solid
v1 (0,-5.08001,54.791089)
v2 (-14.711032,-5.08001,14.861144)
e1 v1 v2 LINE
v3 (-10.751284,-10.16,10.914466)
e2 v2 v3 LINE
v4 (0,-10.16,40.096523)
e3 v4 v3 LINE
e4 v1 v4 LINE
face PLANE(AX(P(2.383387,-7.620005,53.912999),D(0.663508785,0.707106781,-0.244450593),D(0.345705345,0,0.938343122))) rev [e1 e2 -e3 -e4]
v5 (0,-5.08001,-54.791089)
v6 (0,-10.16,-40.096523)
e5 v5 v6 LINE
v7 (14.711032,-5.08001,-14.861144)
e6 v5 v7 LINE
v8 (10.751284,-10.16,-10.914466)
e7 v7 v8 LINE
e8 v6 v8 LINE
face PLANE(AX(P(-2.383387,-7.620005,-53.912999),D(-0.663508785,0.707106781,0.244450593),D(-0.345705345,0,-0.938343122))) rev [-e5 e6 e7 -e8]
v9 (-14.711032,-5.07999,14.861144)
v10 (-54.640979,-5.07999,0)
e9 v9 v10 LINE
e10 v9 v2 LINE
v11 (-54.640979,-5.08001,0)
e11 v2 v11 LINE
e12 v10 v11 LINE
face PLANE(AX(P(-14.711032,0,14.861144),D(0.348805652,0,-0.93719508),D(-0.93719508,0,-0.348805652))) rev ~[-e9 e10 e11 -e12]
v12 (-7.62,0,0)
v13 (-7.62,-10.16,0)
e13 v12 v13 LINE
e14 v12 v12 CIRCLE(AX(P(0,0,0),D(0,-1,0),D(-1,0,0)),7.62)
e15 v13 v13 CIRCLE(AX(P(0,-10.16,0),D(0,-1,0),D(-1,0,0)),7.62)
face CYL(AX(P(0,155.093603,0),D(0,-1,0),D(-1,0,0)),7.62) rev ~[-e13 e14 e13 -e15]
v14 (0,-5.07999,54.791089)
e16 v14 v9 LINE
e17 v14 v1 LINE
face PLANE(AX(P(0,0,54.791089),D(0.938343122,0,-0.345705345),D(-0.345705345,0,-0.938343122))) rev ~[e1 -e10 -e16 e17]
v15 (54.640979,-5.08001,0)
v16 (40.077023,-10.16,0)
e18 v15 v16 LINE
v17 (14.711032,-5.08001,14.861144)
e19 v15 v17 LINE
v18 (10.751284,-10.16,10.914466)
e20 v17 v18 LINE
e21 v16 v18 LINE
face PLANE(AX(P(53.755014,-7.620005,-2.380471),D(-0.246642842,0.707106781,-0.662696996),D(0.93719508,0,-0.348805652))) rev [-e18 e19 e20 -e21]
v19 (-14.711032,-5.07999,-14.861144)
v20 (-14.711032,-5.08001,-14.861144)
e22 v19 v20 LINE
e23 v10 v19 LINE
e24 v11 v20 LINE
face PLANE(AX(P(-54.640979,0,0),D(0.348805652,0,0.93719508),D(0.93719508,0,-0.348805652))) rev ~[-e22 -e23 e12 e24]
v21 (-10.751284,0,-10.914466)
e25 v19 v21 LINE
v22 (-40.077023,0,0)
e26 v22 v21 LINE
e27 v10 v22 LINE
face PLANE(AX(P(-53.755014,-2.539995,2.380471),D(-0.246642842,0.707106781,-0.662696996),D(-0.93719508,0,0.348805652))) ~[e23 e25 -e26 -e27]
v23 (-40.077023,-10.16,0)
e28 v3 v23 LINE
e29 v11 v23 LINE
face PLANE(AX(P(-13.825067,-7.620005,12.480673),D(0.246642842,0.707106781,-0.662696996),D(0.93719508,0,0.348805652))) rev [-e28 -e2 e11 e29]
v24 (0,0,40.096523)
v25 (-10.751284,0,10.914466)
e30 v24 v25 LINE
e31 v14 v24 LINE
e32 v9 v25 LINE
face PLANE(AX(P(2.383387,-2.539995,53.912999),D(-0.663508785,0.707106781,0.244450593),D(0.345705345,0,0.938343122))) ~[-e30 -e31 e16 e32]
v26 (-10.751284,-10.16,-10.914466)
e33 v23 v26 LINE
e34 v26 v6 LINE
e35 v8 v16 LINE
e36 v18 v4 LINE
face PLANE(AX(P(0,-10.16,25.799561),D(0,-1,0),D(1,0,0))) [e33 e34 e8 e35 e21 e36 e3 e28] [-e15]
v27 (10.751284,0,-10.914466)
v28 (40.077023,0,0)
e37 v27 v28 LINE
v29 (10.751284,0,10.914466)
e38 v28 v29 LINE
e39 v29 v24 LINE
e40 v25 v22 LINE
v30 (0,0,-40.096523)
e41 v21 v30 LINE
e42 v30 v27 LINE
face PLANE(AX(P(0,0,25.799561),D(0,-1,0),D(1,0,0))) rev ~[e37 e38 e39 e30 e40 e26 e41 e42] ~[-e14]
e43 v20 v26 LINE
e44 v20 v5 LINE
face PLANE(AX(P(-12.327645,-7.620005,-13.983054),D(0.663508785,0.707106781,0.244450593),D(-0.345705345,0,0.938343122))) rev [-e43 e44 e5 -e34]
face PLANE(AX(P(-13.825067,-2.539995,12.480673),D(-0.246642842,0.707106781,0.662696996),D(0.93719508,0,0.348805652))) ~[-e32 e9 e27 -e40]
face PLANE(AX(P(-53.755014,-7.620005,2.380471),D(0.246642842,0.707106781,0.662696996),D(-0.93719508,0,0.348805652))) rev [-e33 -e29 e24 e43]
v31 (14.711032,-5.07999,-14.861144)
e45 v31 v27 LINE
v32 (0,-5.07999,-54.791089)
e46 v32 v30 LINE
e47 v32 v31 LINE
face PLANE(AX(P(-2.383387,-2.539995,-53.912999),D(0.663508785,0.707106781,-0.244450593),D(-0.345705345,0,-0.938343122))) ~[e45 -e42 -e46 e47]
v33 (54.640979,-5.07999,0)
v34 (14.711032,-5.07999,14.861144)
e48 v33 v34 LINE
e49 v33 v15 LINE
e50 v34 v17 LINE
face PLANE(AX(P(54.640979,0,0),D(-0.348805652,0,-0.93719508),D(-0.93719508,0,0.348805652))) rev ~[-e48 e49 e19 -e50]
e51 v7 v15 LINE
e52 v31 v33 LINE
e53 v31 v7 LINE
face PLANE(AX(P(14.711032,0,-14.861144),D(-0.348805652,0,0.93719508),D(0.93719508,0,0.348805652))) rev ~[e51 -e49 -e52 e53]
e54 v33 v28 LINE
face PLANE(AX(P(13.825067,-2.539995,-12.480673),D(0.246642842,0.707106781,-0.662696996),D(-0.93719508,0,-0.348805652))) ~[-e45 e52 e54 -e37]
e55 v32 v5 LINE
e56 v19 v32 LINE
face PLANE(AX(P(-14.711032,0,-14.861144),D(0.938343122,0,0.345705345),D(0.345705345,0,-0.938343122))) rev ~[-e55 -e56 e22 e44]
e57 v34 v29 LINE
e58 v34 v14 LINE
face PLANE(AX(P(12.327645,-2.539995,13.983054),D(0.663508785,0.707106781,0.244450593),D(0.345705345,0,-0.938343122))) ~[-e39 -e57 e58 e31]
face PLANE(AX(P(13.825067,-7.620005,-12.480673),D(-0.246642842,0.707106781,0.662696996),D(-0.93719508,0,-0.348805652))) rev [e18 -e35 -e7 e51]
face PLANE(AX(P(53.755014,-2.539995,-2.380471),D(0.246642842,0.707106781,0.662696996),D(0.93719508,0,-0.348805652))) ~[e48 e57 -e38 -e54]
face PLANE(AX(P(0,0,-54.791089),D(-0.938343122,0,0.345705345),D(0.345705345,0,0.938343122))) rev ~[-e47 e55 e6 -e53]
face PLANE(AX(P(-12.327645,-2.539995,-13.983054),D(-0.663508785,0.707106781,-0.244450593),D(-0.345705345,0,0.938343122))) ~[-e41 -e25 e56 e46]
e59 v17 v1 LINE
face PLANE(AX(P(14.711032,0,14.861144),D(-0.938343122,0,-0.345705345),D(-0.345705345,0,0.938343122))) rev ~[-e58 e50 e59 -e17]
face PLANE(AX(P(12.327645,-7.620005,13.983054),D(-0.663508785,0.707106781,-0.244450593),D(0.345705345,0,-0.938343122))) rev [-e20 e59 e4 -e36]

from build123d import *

# Parameters (mm, degrees)
F1_DEPTH = 10.16
F2_SIZE  = 5.07999
F4_D     = 15.24


# Not quite as in the source:
# - a fillet or chamfer is up to 0.001 mm smaller than in the source, because OpenCascade refuses the exact size


with BuildPart() as f1:
    # F0 (on Front) → F1 (new body)
    with BuildSketch(Plane.XZ):
        Polygon((14.7110316902, 14.8611441255), (0, 54.7910891473), (-14.7110316902, 14.8611441255), (0, 0), align=None)
        Polygon((54.6409785748, 0), (14.7110316902, 14.8611441255), (0, 0), (14.7110316902, -14.8611441255), align=None)
        Polygon((14.7110316902, -14.8611441255), (0, 0), (-14.7110316902, -14.8611441255), (0, -54.7910891473), align=None)
        Polygon((0, 0), (-14.7110316902, 14.8611441255), (-54.6409785748, 0), (-14.7110316902, -14.8611441255), align=None)
    extrude(amount=F1_DEPTH)

    # F2 (size 5.08 in the source; OpenCascade refuses exactly that, so slightly less here)
    f2_edges = [f1.edges().sort_by_distance(p)[0] for p in [
        (7.355516, 0, 34.826117),
        (-7.355516, 0, 34.826117),
        (-7.355516, -10.16, 34.826117),
        (7.355516, -10.16, 34.826117),
        (-34.676005, -10.16, 7.430572),
        (-34.676005, 0, 7.430572),
        (-34.676005, -10.16, -7.430572),
        (-34.676005, 0, -7.430572),
        (34.676005, 0, -7.430572),
        (34.676005, 0, 7.430572),
        (34.676005, -10.16, 7.430572),
        (34.676005, -10.16, -7.430572),
        (-7.355516, 0, -34.826117),
        (7.355516, 0, -34.826117),
        (-7.355516, -10.16, -34.826117),
        (7.355516, -10.16, -34.826117),
    ]]
    chamfer(f2_edges, length=F2_SIZE)

    # F4 (through all)
    with Locations(Plane(origin=(0, 0, 0), x_dir=(1, 0, 0), z_dir=(0, 1, 0))):
        with Locations((0, 0)):
            Hole(F4_D / 2)


solid = f1.part
